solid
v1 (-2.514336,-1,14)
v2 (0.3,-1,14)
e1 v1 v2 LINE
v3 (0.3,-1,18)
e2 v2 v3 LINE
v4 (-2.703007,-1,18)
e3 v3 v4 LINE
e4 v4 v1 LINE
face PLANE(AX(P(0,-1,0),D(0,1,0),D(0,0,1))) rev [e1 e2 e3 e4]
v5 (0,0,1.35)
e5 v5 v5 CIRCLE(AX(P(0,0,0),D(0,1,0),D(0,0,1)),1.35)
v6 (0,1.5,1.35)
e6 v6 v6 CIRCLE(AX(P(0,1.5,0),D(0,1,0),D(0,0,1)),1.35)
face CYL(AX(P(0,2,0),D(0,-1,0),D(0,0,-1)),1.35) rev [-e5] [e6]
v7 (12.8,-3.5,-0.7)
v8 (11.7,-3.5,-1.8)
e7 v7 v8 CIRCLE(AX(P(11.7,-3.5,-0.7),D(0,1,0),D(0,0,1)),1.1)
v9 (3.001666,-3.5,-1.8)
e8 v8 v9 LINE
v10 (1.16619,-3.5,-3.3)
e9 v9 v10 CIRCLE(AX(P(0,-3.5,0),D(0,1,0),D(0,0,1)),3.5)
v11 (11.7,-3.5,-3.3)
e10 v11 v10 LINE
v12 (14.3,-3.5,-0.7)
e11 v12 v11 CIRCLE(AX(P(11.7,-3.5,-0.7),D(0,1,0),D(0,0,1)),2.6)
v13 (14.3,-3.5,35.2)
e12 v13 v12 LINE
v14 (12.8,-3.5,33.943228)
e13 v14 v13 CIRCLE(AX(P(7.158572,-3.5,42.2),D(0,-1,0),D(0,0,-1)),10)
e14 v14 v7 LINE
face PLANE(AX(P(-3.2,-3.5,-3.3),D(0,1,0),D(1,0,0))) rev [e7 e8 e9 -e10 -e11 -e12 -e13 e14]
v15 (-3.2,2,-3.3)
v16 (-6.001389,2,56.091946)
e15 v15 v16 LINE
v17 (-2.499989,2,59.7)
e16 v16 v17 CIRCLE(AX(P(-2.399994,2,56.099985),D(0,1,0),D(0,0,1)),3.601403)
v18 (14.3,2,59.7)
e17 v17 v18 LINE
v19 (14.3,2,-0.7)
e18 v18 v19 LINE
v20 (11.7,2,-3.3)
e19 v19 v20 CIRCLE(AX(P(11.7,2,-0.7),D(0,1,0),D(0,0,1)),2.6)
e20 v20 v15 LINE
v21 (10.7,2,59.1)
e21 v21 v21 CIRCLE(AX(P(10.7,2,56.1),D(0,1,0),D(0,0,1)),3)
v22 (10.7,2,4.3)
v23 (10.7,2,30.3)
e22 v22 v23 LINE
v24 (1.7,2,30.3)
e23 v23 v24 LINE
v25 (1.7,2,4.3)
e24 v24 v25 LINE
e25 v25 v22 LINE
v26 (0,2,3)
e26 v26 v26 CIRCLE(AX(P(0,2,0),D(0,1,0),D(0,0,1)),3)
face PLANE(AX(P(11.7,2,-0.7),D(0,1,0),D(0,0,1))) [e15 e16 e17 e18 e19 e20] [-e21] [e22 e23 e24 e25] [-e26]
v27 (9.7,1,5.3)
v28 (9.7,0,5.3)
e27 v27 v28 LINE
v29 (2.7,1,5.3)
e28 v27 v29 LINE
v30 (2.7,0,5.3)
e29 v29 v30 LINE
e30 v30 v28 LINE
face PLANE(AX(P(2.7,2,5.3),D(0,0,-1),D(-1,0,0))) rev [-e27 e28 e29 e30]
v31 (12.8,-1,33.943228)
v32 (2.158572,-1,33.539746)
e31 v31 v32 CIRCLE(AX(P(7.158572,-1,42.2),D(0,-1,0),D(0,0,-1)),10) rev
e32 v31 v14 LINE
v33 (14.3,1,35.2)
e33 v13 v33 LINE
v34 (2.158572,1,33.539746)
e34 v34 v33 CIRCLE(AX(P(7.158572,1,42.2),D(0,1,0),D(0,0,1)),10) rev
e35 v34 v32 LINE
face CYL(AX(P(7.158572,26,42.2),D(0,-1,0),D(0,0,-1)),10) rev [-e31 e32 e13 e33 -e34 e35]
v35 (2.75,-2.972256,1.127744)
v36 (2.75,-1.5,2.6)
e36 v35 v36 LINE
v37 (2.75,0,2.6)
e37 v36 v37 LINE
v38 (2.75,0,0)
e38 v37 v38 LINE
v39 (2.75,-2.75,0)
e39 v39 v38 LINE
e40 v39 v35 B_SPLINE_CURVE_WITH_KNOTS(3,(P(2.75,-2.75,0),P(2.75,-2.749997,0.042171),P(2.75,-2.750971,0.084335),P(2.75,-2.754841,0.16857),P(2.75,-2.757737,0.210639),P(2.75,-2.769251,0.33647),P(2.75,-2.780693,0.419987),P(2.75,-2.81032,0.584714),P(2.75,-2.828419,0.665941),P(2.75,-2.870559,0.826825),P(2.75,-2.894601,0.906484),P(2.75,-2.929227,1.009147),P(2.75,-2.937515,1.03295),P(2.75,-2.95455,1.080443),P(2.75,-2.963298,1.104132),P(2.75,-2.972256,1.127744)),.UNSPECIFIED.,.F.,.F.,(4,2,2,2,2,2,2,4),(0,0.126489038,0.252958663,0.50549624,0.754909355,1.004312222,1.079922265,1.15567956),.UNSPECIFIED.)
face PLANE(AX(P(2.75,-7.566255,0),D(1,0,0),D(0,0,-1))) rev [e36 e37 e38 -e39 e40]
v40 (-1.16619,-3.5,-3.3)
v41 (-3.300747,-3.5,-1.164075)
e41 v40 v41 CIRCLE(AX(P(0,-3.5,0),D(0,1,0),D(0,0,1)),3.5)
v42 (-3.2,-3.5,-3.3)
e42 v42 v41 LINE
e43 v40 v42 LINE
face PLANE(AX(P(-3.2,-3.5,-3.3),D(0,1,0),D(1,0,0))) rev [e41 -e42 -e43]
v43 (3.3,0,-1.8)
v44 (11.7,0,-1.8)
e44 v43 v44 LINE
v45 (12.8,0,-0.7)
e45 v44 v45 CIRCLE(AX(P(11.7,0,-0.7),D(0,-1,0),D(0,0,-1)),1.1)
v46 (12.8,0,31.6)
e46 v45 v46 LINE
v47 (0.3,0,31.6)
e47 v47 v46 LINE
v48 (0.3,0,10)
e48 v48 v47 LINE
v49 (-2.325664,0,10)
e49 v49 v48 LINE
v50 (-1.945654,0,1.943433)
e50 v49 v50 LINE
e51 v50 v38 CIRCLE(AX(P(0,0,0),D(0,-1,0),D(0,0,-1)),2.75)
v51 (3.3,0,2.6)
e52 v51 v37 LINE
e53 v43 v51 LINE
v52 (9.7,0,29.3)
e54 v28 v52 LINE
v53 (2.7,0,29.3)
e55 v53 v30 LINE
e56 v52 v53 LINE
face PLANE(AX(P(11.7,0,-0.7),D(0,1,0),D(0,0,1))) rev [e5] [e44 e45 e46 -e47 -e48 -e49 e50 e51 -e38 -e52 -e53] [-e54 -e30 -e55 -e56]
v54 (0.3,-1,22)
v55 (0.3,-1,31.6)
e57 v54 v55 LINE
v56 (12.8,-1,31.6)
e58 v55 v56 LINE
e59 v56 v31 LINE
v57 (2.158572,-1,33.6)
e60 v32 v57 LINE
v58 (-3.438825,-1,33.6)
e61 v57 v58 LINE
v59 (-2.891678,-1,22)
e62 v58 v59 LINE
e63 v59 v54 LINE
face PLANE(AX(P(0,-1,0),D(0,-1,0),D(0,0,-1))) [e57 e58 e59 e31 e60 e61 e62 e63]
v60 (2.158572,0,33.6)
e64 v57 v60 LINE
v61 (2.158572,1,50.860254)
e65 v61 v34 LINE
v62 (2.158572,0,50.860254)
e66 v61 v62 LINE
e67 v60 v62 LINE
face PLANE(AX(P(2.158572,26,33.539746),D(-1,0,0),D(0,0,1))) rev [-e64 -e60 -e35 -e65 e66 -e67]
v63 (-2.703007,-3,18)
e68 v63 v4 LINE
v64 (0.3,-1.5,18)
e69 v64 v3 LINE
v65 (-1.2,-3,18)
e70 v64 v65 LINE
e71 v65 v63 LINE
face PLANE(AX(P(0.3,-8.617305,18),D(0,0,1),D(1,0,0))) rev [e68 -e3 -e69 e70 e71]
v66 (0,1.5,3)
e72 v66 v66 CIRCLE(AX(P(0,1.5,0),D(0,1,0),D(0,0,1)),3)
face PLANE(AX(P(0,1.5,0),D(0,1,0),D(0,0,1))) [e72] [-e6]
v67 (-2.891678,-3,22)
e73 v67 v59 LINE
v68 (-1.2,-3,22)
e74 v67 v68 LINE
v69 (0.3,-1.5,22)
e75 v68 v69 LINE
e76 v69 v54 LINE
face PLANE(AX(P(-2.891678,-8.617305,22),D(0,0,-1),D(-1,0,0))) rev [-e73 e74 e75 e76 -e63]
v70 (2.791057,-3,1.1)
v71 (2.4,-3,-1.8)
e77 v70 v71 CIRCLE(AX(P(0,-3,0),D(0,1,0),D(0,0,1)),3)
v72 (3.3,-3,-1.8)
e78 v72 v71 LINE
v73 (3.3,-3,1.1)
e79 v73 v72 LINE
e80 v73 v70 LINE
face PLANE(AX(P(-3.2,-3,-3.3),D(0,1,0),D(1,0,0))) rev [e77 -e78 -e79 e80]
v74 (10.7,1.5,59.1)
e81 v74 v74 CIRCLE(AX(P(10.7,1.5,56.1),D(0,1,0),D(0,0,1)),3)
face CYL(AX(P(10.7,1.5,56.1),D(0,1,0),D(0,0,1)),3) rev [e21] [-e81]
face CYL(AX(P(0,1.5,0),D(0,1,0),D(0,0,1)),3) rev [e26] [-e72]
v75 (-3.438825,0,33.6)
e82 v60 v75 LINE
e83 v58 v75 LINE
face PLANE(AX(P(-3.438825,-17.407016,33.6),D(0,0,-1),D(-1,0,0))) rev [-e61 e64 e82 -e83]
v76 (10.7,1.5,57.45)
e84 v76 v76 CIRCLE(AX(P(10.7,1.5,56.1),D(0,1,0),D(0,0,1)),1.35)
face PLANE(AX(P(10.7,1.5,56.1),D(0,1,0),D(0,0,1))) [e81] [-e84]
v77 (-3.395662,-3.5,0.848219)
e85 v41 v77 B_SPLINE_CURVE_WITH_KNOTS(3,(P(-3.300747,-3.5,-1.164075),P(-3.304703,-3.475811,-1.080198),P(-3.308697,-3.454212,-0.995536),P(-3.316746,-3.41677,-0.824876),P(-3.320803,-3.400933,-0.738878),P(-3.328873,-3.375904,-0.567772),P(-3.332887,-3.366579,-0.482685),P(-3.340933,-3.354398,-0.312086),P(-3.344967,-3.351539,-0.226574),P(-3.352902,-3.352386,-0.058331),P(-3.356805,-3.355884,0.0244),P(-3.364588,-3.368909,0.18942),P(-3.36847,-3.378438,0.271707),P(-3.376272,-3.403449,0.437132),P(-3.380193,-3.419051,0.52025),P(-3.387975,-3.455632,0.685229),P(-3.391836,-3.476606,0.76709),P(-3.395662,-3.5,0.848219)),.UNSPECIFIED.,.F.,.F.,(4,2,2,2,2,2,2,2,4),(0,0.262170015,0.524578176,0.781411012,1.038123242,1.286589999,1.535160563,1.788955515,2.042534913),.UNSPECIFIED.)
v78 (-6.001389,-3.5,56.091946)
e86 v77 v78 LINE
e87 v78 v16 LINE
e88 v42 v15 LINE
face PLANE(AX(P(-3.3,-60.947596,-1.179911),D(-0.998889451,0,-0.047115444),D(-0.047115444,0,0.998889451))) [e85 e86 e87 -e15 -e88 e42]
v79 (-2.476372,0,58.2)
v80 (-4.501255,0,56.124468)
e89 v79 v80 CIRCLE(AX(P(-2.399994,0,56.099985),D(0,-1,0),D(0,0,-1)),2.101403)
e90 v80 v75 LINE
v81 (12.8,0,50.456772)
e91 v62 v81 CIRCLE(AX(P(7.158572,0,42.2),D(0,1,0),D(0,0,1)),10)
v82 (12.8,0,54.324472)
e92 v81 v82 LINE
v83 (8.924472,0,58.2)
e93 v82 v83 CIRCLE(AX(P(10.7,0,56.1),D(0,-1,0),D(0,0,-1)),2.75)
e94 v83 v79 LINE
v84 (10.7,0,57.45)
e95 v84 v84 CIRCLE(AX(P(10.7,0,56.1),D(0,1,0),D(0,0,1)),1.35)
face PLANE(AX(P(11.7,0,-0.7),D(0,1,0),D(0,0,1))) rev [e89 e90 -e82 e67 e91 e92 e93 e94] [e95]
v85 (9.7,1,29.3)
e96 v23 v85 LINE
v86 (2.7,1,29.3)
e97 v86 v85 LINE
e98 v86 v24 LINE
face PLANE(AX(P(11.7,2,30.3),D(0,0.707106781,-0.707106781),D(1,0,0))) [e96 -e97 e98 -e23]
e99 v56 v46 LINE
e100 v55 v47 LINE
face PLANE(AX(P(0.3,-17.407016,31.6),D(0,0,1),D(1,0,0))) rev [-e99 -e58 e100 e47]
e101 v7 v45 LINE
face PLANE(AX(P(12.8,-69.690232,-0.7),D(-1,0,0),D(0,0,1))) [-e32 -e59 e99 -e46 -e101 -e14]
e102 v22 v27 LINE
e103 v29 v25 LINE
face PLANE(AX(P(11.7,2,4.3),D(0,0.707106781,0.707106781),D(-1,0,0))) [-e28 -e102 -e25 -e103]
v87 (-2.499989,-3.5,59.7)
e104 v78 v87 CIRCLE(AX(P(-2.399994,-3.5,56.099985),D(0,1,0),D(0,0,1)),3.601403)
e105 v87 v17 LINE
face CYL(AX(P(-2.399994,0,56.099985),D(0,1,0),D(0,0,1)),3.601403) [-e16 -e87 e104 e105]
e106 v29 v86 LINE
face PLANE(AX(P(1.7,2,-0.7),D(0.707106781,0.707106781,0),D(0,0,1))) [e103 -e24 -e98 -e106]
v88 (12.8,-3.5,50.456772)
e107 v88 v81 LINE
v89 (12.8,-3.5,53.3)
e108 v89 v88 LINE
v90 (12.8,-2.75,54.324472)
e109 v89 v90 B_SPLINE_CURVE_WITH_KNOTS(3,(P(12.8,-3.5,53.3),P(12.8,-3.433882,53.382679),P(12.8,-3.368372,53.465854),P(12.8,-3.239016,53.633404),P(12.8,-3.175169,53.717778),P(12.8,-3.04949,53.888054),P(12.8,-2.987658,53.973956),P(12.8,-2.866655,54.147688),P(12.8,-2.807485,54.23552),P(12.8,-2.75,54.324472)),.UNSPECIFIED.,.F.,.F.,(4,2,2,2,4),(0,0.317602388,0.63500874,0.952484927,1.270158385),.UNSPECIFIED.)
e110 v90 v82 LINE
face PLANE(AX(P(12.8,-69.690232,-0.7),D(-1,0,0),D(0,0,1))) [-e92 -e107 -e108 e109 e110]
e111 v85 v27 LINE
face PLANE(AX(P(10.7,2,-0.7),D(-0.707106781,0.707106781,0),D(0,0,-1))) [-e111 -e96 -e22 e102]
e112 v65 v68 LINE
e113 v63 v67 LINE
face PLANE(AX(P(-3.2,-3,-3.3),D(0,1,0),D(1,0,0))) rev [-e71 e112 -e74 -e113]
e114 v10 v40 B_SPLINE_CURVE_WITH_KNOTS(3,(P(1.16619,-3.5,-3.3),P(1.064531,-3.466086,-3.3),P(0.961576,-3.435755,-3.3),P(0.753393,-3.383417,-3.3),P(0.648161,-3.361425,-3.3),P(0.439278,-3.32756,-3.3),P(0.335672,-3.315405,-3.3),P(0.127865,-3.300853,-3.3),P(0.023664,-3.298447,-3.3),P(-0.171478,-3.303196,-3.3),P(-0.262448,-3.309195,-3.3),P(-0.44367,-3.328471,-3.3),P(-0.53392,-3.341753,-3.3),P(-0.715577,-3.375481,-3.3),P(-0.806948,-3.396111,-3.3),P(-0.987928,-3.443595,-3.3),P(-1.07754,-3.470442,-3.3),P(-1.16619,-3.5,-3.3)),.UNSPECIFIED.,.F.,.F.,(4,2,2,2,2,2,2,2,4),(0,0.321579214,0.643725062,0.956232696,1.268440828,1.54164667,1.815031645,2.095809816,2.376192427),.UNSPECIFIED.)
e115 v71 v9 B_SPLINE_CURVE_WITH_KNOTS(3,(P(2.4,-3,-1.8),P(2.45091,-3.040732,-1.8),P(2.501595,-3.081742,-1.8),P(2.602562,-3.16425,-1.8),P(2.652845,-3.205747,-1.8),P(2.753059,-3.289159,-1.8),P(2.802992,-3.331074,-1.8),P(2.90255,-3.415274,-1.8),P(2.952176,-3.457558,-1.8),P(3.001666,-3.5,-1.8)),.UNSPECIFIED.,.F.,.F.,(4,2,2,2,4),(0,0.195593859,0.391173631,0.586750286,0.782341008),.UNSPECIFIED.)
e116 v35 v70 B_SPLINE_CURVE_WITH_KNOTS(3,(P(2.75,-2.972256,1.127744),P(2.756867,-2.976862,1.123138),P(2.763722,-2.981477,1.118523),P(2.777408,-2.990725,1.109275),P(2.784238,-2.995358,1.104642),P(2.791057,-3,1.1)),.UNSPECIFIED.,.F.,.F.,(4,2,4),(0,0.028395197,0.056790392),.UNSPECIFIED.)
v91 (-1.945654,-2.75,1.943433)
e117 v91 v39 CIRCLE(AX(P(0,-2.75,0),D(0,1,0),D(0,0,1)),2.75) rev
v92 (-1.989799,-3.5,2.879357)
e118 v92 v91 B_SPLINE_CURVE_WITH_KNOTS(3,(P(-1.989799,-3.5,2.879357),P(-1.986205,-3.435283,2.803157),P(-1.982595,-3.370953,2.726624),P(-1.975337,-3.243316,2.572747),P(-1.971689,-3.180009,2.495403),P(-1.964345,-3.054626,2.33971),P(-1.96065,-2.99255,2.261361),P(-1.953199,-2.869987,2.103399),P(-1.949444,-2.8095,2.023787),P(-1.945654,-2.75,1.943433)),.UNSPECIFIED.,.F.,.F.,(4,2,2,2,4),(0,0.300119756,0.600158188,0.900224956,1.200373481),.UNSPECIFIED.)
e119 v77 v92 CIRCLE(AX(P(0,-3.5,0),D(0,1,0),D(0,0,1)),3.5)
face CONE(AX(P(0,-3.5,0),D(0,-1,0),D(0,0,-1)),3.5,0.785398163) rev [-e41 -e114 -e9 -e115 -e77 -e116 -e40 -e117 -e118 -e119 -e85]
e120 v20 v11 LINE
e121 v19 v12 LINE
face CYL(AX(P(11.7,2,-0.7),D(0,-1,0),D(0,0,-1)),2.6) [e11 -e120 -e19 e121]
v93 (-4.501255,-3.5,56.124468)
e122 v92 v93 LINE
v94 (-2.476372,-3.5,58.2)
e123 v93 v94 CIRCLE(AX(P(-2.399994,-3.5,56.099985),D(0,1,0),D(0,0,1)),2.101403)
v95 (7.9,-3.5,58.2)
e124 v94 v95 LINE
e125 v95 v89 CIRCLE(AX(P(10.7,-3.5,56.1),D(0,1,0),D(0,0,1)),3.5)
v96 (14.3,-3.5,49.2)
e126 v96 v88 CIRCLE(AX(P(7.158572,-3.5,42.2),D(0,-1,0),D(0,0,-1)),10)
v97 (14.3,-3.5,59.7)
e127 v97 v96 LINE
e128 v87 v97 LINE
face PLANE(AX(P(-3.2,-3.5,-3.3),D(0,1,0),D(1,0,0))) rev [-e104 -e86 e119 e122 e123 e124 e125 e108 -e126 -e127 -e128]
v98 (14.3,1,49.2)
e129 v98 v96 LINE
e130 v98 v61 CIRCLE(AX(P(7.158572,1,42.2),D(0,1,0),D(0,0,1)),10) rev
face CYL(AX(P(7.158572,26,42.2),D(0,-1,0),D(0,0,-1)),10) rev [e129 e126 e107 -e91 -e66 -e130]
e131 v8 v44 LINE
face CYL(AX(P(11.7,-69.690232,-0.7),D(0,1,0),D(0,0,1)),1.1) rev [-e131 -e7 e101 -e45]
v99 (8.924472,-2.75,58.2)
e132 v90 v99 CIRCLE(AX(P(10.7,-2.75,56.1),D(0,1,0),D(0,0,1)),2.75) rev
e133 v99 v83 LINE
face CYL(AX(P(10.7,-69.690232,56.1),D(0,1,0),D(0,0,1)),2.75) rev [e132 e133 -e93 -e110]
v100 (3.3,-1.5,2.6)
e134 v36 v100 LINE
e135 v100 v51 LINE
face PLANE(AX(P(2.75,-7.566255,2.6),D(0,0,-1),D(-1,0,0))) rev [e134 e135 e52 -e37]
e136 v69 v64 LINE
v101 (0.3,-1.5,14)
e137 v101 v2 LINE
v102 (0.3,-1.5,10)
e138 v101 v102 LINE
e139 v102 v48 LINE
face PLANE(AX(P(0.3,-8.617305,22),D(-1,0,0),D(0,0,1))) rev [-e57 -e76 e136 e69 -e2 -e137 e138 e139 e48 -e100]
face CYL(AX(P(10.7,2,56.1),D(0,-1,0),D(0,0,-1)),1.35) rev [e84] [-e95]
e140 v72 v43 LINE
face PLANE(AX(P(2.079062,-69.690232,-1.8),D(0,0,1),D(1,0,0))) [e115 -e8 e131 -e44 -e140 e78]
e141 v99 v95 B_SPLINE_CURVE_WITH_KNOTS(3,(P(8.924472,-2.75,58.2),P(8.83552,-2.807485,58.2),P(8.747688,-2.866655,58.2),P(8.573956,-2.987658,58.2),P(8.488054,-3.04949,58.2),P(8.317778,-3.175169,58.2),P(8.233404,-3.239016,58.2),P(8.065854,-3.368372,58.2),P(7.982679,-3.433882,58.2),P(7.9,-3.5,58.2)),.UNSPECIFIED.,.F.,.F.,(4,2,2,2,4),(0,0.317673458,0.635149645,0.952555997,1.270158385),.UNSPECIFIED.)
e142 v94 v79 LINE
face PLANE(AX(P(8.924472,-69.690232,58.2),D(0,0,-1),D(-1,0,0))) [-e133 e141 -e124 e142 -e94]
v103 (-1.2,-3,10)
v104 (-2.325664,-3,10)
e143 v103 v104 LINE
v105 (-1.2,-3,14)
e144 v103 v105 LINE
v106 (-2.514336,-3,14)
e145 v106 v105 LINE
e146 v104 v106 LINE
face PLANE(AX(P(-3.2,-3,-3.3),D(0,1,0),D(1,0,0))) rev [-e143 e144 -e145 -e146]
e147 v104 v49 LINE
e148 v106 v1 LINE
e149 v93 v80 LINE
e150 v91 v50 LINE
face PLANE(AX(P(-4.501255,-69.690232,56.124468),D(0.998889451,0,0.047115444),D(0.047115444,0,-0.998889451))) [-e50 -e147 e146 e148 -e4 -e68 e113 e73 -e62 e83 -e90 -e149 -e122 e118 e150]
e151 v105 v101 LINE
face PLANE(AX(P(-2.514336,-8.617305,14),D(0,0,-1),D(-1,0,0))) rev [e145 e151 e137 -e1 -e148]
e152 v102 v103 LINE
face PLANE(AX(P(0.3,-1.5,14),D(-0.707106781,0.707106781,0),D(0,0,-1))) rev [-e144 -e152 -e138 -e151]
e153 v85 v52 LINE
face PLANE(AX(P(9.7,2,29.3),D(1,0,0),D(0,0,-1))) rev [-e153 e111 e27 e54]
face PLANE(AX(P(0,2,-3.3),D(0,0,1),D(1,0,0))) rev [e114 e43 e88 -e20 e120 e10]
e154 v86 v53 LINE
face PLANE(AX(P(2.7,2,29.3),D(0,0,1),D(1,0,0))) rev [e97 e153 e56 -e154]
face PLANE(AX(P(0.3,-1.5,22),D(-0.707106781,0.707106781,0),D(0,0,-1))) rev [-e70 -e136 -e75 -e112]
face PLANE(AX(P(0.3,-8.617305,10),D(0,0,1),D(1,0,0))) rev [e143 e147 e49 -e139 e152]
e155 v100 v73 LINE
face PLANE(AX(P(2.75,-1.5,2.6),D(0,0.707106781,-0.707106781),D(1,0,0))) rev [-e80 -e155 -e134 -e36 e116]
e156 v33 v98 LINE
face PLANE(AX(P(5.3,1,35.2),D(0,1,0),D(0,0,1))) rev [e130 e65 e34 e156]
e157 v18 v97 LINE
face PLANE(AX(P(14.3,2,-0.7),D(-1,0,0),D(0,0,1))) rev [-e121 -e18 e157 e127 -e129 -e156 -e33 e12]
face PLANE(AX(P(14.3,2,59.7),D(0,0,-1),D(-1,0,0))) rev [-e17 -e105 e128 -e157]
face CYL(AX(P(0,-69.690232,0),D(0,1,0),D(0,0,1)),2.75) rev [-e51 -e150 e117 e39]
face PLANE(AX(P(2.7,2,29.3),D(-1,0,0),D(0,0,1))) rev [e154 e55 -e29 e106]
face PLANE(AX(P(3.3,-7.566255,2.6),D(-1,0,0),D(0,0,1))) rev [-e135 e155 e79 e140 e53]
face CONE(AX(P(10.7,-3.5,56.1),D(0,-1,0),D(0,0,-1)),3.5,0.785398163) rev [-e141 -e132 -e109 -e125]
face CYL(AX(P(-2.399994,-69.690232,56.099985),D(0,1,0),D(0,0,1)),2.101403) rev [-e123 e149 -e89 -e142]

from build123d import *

# Parameters (mm, degrees)
SKETCH_1_R               = 1.35
EXTRUDE_1_DEPTH          = 2
EXTRUDE_2_DEPTH          = 2
CUT_EXTRUDE_1_DEPTH      = 62.421331799
CUT_EXTRUDE_1_DEPTH_BACK = 62.421331799
EXTRUDE_START            = 3.5
EXTRUDE_3_DEPTH          = 3.5
SKETCH_5_W               = 14
SKETCH_5_H               = 4.5
CUT_EXTRUDE_2_DEPTH      = 9
CUT_EXTRUDE_3_REACH      = 63.635
SKETCH_7_W               = 7
SKETCH_7_H               = 24
CUT_EXTRUDE_4_DEPTH      = 62.488454201
CHAMFER_1_SIZE           = 1
EXTRUDE_4_DEPTH          = 3
EXTRUDE_START_2          = 3
EXTRUDE_5_DEPTH          = 3
CHAMFER_2_SIZE           = 1.5
EXTRUDE_6_DEPTH          = 1
EXTRUDE_START_3          = 1
EXTRUDE_7_DEPTH          = 1
SKETCH_12_R              = 3
CUT_EXTRUDE_5_DEPTH      = 0.5


with BuildPart() as part:
    # 草图1 → 凸台-拉伸1 (new body)
    with BuildSketch(Plane(origin=(0, 0, 0), x_dir=(1, 0, 0), z_dir=(0, 1, 0))):
        with BuildLine():
            Line((0, 3.3), (11.7, 3.3))
            ThreePointArc((11.7, 3.3), (13.538477631, 2.538477631), (14.3, 0.7))
            Line((14.3, 0.7), (14.3, -59.7))
            Line((14.3, -59.7), (-3.3, -59.7))
            Line((-3.3, -59.7), (-3.3, 0))
            Line((-3.3, 0), (-3.3, 3.3))
            Line((-3.3, 3.3), (0, 3.3))
        make_face()
        with Locations(Location((0, 0, 0), (0, 0, 270))):
            Circle(SKETCH_1_R, mode=Mode.SUBTRACT)
        with Locations(Location((10.7, -56.1, 0), (0, 0, 270))):
            Circle(SKETCH_1_R, mode=Mode.SUBTRACT)
    extrude(amount=EXTRUDE_1_DEPTH)

    # 草图2 → 凸台-拉伸2 (add)
    with BuildSketch(Plane(origin=(0, 2, 0), x_dir=(1, 0, 0), z_dir=(0, 1, 0))):
        Polygon((-3.3, 1.179910787), (-6.171573065, -59.7), (-3.3, -59.7), align=None)
    extrude(amount=-EXTRUDE_2_DEPTH)

    # 草图3 → 切除-拉伸1 (cut, two sides: drawn at the far end of the back side and taken through both)
    with BuildSketch(Plane(origin=(0, 2, 0), x_dir=(1, 0, 0), z_dir=(0, 1, 0)).offset(-CUT_EXTRUDE_1_DEPTH_BACK)):
        Polygon((-3.3, 3.3), (-3.3, 1.179910787), (-3.2, 3.3), align=None)
        with BuildLine():
            ThreePointArc((-2.499988961, -59.7), (-4.984483511, -58.608076588), (-6.001389, -56.091946))
            Line((-6.001389, -56.091946), (-6.171573065, -59.7))
            Line((-6.171573065, -59.7), (-2.499988961, -59.7))
        make_face()
    extrude(amount=CUT_EXTRUDE_1_DEPTH + CUT_EXTRUDE_1_DEPTH_BACK, mode=Mode.SUBTRACT)

    # 草图4 → 凸台-拉伸3 (add)
    with BuildSketch(Plane.XZ.offset(EXTRUDE_START)):
        with BuildLine():
            Line((-6.001389, 56.091946), (-3.2, -3.3))
            Line((-3.2, -3.3), (11.7, -3.3))
            ThreePointArc((11.7, -3.3), (13.538477631, -2.538477631), (14.3, -0.7))
            Line((14.3, -0.7), (14.3, 59.7))
            Line((14.3, 59.7), (-2.499988961, 59.7))
            ThreePointArc((-2.499988961, 59.7), (-4.984483511, 58.608076588), (-6.001389, 56.091946))
        make_face()
        with BuildLine():
            Line((12.8, -0.7), (12.8, 54.32447191))
            ThreePointArc((12.8, 54.32447191), (12.644543648, 58.044543648), (8.92447191, 58.2))
            Line((8.92447191, 58.2), (-2.476371899, 58.2))
            ThreePointArc((-2.476371899, 58.2), (-3.904150356, 57.567435732), (-4.501255338, 56.124468472))
            Line((-4.501255338, 56.124468472), (-1.945653662, 1.943433001))
            ThreePointArc((-1.945653662, 1.943433001), (-1.872904729, -2.013635488), (2.079062289, -1.8))
            Line((2.079062289, -1.8), (11.7, -1.8))
            ThreePointArc((11.7, -1.8), (12.477817459, -1.477817459), (12.8, -0.7))
        make_face(mode=Mode.SUBTRACT)
    extrude(amount=-EXTRUDE_3_DEPTH)

    # 草图5 → 切除-拉伸2 (cut)
    with BuildSketch(Plane(origin=(14.3, 0, 0), x_dir=(0, 0, -1), z_dir=(1, 0, 0))):
        with Locations((-42.2, -1.25)):
            Rectangle(SKETCH_5_W, SKETCH_5_H)
    extrude(amount=-CUT_EXTRUDE_2_DEPTH, mode=Mode.SUBTRACT)

    # 切除-拉伸3: up to this face of the body (flat: up to its plane)
    cut_extrude_3_end = Plane(part.part.faces().sort_by_distance((9.8, 1, 42.2))[0])
    # 草图6 → 切除-拉伸3 (cut, up to the picked face)
    with BuildSketch(Plane.XZ.offset(3.5), mode=Mode.PRIVATE) as cut_extrude_3_sk1:
        with BuildLine():
            Line((2.158571571, 33.539745962), (2.158571571, 50.860254038))
            ThreePointArc((2.158571571, 50.860254038), (17.158571571, 42.2), (2.158571571, 33.539745962))
        make_face()
    cut_extrude_3_tool1 = split(extrude(cut_extrude_3_sk1.sketch, amount=-CUT_EXTRUDE_3_REACH, mode=Mode.PRIVATE), bisect_by=cut_extrude_3_end, keep=Keep.BOTH, mode=Mode.PRIVATE)
    add(cut_extrude_3_tool1.solids().sort_by(Axis((8.87184, -3.5, 42.2), (0, 1, 0)))[0], mode=Mode.SUBTRACT)

    # 草图7 → 切除-拉伸4 (cut, through all)
    with BuildSketch(Plane.XZ):
        with Locations((6.2, 17.3)):
            Rectangle(SKETCH_7_W, SKETCH_7_H)
    extrude(amount=-CUT_EXTRUDE_4_DEPTH, mode=Mode.SUBTRACT)

    # 倒角1
    chamfer_1_edges = [part.edges().sort_by_distance(p)[0] for p in [
        (2.7, 2, 17.3),
        (6.2, 2, 29.3),
        (9.7, 2, 17.3),
        (6.2, 2, 5.3),
    ]]
    chamfer(chamfer_1_edges, length=CHAMFER_1_SIZE)

    # 草图8 → 凸台-拉伸4 (add)
    with BuildSketch(Plane.XZ):
        Polygon((-2.891678333, 22), (0.3, 22), (0.3, 18), (-2.703007027, 18), align=None)
        Polygon((-2.514335721, 14), (0.3, 14), (0.3, 10), (-2.325664416, 10), align=None)
    extrude(amount=EXTRUDE_4_DEPTH)

    # 草图9 → 凸台-拉伸5 (add)
    with BuildSketch(Plane.XZ.offset(EXTRUDE_START_2)):
        with BuildLine():
            Line((2.75, 0), (2.75, 2.6))
            Line((2.75, 2.6), (3.3, 2.6))
            Line((3.3, 2.6), (3.3, -1.8))
            Line((3.3, -1.8), (2.079062289, -1.8))
            ThreePointArc((2.079062289, -1.8), (2.576812109, -0.960489122), (2.75, 0))
        make_face()
    extrude(amount=-EXTRUDE_5_DEPTH)

    # 倒角2
    chamfer_2_edges = [part.edges().sort_by_distance(p)[0] for p in [
        (0.3, -3, 20),
        (0.3, -3, 12),
        (3.025, -3, 2.6),
    ]]
    chamfer(chamfer_2_edges, length=CHAMFER_2_SIZE)

    # 草图10 → 凸台-拉伸6 (add)
    with BuildSketch(Plane.XZ):
        Polygon((0.3, 22), (0.3, 31.6), (-3.344489466, 31.6), (-2.891678333, 22), align=None)
        Polygon((0.3, 18), (0.3, 14), (-2.514335721, 14), (-2.703007027, 18), align=None)
    extrude(amount=EXTRUDE_6_DEPTH)

    # 草图11 → 凸台-拉伸7 (add)
    with BuildSketch(Plane.XZ.offset(EXTRUDE_START_3)):
        with BuildLine():
            Line((0.3, 31.6), (12.8, 31.6))
            Line((12.8, 31.6), (12.8, 33.943227914))
            ThreePointArc((12.8, 33.943227914), (7.537460775, 32.207180429), (2.158571571, 33.539745962))
            Line((2.158571571, 33.539745962), (2.158571571, 33.6))
            Line((2.158571571, 33.6), (-3.438825119, 33.6))
            Line((-3.438825119, 33.6), (-3.344489466, 31.6))
            Line((-3.344489466, 31.6), (0.3, 31.6))
        make_face()
    extrude(amount=-EXTRUDE_7_DEPTH)

    # 草图12 → 切除-拉伸5 (cut)
    with BuildSketch(Plane(origin=(0, 2, 0), x_dir=(1, 0, 0), z_dir=(0, 1, 0))):
        with Locations(Location((0, 0, 0), (0, 0, 270))):
            Circle(SKETCH_12_R)
        with Locations(Location((10.7, -56.1, 0), (0, 0, 270))):
            Circle(SKETCH_12_R)
    extrude(amount=-CUT_EXTRUDE_5_DEPTH, mode=Mode.SUBTRACT)

    # 倒角3
    # the kernel refuses this chamfer: 0.75 mm, written as the material it takes off along each edge
    with BuildSketch(Plane(origin=(10.7, -3.5, 56.1), x_dir=(-0.7048818539423597, 0, -0.7093247295722755), z_dir=(-0.7093247295722755, 0, 0.7048818539423597))) as chamfer_3_piece_1:
        with BuildLine():
            Line((3.521213203, 0.021213203), (2.728786797, -0.771213203))
            Line((2.728786797, -0.771213203), (2.713786797, -0.771213203))
            ThreePointArc((2.713786797, -0.771213203), (2.735, -0.385606602), (2.735, 0))
            Line((2.735, 0), (2.75, 0.015))
            ThreePointArc((2.75, 0.015), (3.135606602, 0.015), (3.521213203, 0.036213203))
            Line((3.521213203, 0.036213203), (3.521213203, 0.021213203))
        make_face()
    revolve(axis=Axis((10.7, -3.5, 56.1), (0, -1, 0)), revolution_arc=359.64, mode=Mode.SUBTRACT)
    with BuildSketch(Plane(origin=(0, -3.5, 0), x_dir=(0.6787525361233852, 0, 0.7343670708209028), z_dir=(0.7343670708209028, 0, -0.6787525361233852))) as chamfer_3_piece_2:
        with BuildLine():
            Line((2.728786797, -0.771213203), (3.521213203, 0.021213203))
            Line((3.521213203, 0.021213203), (3.521213203, 0.036213203))
            ThreePointArc((3.521213203, 0.036213203), (3.135606602, 0.015), (2.75, 0.015))
            Line((2.75, 0.015), (2.735, 0))
            ThreePointArc((2.735, 0), (2.735, -0.385606602), (2.713786797, -0.771213203))
            Line((2.713786797, -0.771213203), (2.728786797, -0.771213203))
        make_face()
    revolve(axis=Axis((0, -3.5, 0), (0, -1, 0)), revolution_arc=359.64, mode=Mode.SUBTRACT)


solid = part.part
